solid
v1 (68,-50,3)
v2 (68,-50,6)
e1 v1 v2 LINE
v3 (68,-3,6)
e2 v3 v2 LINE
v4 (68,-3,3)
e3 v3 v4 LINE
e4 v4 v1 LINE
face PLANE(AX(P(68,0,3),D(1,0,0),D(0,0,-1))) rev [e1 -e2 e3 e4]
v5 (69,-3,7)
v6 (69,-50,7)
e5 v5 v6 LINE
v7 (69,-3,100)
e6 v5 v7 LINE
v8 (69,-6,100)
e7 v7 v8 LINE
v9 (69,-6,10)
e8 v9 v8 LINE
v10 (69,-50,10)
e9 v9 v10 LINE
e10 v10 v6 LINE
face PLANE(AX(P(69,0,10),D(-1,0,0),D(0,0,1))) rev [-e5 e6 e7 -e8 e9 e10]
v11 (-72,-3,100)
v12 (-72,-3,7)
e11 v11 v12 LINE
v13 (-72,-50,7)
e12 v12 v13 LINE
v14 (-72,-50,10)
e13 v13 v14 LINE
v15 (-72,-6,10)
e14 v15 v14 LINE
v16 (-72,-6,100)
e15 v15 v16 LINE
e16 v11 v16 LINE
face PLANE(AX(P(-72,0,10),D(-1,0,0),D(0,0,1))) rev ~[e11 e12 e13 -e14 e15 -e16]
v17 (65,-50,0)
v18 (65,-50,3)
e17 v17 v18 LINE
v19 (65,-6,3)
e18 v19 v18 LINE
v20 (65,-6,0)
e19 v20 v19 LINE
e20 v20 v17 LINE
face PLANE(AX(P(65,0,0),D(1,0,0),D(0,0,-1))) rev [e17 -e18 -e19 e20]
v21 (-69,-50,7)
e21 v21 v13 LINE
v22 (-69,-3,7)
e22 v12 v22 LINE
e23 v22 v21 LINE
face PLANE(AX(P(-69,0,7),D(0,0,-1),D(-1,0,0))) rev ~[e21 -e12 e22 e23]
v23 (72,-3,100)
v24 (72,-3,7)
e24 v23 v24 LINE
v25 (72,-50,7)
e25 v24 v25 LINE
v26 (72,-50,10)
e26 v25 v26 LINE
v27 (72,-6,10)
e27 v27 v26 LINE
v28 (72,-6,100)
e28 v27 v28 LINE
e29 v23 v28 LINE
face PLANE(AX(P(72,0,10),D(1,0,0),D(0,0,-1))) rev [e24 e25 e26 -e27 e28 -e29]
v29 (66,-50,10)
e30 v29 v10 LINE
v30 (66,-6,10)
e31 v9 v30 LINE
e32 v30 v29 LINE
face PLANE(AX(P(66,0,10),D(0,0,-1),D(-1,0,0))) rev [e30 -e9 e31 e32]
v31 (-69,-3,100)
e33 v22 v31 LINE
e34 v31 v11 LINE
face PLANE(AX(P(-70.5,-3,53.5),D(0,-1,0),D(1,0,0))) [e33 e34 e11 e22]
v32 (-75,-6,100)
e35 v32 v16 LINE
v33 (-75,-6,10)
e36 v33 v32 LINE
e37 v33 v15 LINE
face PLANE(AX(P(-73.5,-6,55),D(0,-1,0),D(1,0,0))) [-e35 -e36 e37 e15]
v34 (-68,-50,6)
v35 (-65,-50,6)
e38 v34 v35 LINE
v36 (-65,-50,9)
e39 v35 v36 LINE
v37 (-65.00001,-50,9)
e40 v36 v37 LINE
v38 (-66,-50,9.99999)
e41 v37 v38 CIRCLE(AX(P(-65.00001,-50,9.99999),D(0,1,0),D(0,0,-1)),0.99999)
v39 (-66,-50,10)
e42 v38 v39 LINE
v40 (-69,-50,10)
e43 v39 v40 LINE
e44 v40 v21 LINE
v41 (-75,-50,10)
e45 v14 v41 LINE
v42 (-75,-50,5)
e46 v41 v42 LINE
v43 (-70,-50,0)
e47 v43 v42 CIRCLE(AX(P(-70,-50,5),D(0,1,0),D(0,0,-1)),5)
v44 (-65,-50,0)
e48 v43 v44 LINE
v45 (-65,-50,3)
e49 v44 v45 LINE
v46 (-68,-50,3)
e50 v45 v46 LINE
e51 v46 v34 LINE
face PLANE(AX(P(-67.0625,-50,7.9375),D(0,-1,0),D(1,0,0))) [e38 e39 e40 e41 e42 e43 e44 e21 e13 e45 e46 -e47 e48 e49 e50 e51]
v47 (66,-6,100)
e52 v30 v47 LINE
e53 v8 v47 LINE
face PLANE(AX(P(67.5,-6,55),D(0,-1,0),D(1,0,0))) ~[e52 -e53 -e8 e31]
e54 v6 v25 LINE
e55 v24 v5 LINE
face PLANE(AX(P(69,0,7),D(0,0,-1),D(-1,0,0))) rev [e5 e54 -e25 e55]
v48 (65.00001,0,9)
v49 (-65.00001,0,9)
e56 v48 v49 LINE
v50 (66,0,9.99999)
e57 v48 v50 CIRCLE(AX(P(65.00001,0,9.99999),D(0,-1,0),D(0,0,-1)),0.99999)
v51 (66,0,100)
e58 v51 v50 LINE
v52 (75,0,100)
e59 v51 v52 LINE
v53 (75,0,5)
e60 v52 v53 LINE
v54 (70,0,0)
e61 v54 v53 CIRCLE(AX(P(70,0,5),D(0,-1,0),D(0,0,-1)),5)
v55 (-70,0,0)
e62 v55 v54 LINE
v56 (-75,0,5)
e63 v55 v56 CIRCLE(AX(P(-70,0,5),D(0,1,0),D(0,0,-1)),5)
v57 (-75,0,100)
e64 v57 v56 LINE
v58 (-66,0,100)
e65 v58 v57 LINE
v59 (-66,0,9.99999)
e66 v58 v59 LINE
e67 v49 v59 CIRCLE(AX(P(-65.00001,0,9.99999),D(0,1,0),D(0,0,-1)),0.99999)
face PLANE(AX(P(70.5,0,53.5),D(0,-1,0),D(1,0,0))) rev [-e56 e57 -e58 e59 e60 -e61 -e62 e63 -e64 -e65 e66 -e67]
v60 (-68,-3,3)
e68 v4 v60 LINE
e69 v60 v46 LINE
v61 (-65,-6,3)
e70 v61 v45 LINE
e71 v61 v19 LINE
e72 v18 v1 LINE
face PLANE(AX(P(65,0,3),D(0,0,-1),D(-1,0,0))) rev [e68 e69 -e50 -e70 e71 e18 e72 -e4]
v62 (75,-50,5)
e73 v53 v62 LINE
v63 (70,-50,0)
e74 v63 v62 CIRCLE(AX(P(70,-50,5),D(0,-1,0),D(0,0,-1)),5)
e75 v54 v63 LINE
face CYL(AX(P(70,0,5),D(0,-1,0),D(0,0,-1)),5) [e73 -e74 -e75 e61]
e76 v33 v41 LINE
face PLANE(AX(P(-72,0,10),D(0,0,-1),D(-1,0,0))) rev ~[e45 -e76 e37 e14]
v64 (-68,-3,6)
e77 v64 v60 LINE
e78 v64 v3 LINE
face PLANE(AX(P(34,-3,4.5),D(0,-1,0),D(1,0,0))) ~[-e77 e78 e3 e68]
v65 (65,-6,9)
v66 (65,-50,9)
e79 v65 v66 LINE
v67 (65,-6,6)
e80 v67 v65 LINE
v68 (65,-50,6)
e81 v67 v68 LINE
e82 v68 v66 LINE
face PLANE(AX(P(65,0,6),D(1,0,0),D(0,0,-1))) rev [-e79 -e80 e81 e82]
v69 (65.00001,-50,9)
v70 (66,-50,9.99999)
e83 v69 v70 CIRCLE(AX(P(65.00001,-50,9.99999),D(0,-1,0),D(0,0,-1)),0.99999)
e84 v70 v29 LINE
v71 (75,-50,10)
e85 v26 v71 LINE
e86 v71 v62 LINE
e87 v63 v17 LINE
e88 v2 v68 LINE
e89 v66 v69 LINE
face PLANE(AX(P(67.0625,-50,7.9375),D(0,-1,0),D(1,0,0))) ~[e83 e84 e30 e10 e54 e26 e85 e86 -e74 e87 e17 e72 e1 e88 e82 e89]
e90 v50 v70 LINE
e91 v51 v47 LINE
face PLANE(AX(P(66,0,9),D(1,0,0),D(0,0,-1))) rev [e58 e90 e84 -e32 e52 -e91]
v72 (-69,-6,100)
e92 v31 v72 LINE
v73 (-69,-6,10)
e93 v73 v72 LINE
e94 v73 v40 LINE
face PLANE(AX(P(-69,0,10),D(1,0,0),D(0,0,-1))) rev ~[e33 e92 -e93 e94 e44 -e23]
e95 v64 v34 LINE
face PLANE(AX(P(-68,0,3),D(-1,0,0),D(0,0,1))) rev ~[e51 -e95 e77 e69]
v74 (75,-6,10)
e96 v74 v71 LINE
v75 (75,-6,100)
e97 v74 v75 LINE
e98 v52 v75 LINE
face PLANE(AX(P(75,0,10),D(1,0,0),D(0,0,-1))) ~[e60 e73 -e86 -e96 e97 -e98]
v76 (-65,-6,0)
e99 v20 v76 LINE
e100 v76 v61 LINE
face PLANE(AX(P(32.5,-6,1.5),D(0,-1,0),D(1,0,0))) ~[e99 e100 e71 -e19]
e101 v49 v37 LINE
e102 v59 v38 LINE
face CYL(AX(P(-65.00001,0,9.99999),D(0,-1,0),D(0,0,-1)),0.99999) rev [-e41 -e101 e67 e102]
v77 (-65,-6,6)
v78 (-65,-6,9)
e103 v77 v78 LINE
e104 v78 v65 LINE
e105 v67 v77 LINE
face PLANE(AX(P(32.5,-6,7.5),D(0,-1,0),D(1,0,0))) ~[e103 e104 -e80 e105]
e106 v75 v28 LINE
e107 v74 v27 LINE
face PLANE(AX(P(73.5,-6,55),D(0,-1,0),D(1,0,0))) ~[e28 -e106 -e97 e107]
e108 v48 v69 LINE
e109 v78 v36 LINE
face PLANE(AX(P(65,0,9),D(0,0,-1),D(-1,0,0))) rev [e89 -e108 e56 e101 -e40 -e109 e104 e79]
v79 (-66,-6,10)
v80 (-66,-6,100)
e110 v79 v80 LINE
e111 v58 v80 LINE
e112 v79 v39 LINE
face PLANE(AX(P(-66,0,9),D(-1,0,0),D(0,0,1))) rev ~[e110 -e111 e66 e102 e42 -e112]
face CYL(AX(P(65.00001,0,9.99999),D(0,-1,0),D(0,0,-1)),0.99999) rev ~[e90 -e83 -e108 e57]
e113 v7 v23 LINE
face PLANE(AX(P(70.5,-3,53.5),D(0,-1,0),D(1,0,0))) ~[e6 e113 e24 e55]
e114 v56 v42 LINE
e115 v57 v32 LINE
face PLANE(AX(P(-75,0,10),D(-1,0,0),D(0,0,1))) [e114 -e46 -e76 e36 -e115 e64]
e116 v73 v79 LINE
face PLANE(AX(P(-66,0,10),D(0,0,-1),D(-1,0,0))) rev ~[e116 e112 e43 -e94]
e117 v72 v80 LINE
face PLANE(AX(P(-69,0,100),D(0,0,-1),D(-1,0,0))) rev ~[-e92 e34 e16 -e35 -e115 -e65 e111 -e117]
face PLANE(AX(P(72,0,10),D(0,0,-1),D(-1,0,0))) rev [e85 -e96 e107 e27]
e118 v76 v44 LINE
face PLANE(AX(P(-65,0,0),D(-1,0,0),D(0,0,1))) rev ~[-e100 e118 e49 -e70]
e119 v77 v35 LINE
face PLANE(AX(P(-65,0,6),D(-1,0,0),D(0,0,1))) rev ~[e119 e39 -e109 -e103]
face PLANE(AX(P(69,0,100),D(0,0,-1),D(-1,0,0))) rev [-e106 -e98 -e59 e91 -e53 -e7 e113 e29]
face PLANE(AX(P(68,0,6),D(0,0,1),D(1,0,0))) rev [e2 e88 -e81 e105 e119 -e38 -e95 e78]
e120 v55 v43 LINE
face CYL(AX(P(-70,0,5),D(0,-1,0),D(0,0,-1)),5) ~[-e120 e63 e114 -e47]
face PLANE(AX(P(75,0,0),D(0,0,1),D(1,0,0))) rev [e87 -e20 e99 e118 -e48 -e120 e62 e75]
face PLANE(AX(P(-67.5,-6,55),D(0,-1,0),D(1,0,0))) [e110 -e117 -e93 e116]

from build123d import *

# Parameters (mm, degrees)
F1_DEPTH = 50
F0_W     = 3
F0_H     = 90
F0_W_2   = 65
F0_H_2   = 3
F2_DEPTH = 6
F3_DEPTH = 3
F4_R     = 0.99999
F5_R     = 5


# Not quite as in the source:
# - a fillet or chamfer is up to 0.001 mm smaller than in the source, because OpenCascade refuses the exact size


with BuildPart() as f1:
    # F0 (on Front) → F1 (new body)
    with BuildSketch(Plane.XZ):
        Polygon((-67, 6), (-65, 6), (-65, 9), (-66, 9), (-66, 10), (-69, 10), (-69, 9), (-69, 7), (-69, 6), (-68, 6), align=None)
        Polygon((-72, 3), (-68, 3), (-68, 6), (-69, 6), (-69, 7), (-72, 7), align=None)
        Polygon((-75, 0), (-65, 0), (-65, 3), (-68, 3), (-72, 3), (-72, 7), (-72, 10), (-75, 10), align=None)
    extrude(amount=F1_DEPTH)

    # F0 (on Front) → F2 (join)
    with BuildSketch(Plane.XZ):
        with Locations((-73.5, 55)):
            Rectangle(F0_W, F0_H)
        with Locations((-67.5, 55)):
            Rectangle(F0_W, F0_H)
        with Locations((-32.5, 7.5)):
            Rectangle(F0_W_2, F0_H_2)
        with Locations((-32.5, 1.5)):
            Rectangle(F0_W_2, F0_H_2)
    extrude(amount=F2_DEPTH)

    # F0 (on Front) → F3 (join)
    with BuildSketch(Plane.XZ):
        Polygon((-72, 100), (-72, 10), (-72, 7), (-69, 7), (-69, 9), (-69, 10), (-69, 100), align=None)
        Polygon((-65, 3), (0, 3), (0, 6), (-65, 6), (-67, 6), (-68, 6), (-68, 3), align=None)
    extrude(amount=F3_DEPTH)

    # F4 (radius 1 in the source; OpenCascade refuses exactly that, so slightly less here)
    f4_edges = [f1.edges().sort_by_distance(p)[0] for p in [
        (-66, -25, 9),
    ]]
    fillet(f4_edges, radius=F4_R)

    # F5
    f5_edges = [f1.edges().sort_by_distance(p)[0] for p in [
        (-75, -25, 0),
    ]]
    fillet(f5_edges, radius=F5_R)

    # F6: F1 across plane


with BuildPart() as f1_1:
    add(f1.part)
    add(f1.part.mirror(Plane.YZ))


solid = f1_1.part
